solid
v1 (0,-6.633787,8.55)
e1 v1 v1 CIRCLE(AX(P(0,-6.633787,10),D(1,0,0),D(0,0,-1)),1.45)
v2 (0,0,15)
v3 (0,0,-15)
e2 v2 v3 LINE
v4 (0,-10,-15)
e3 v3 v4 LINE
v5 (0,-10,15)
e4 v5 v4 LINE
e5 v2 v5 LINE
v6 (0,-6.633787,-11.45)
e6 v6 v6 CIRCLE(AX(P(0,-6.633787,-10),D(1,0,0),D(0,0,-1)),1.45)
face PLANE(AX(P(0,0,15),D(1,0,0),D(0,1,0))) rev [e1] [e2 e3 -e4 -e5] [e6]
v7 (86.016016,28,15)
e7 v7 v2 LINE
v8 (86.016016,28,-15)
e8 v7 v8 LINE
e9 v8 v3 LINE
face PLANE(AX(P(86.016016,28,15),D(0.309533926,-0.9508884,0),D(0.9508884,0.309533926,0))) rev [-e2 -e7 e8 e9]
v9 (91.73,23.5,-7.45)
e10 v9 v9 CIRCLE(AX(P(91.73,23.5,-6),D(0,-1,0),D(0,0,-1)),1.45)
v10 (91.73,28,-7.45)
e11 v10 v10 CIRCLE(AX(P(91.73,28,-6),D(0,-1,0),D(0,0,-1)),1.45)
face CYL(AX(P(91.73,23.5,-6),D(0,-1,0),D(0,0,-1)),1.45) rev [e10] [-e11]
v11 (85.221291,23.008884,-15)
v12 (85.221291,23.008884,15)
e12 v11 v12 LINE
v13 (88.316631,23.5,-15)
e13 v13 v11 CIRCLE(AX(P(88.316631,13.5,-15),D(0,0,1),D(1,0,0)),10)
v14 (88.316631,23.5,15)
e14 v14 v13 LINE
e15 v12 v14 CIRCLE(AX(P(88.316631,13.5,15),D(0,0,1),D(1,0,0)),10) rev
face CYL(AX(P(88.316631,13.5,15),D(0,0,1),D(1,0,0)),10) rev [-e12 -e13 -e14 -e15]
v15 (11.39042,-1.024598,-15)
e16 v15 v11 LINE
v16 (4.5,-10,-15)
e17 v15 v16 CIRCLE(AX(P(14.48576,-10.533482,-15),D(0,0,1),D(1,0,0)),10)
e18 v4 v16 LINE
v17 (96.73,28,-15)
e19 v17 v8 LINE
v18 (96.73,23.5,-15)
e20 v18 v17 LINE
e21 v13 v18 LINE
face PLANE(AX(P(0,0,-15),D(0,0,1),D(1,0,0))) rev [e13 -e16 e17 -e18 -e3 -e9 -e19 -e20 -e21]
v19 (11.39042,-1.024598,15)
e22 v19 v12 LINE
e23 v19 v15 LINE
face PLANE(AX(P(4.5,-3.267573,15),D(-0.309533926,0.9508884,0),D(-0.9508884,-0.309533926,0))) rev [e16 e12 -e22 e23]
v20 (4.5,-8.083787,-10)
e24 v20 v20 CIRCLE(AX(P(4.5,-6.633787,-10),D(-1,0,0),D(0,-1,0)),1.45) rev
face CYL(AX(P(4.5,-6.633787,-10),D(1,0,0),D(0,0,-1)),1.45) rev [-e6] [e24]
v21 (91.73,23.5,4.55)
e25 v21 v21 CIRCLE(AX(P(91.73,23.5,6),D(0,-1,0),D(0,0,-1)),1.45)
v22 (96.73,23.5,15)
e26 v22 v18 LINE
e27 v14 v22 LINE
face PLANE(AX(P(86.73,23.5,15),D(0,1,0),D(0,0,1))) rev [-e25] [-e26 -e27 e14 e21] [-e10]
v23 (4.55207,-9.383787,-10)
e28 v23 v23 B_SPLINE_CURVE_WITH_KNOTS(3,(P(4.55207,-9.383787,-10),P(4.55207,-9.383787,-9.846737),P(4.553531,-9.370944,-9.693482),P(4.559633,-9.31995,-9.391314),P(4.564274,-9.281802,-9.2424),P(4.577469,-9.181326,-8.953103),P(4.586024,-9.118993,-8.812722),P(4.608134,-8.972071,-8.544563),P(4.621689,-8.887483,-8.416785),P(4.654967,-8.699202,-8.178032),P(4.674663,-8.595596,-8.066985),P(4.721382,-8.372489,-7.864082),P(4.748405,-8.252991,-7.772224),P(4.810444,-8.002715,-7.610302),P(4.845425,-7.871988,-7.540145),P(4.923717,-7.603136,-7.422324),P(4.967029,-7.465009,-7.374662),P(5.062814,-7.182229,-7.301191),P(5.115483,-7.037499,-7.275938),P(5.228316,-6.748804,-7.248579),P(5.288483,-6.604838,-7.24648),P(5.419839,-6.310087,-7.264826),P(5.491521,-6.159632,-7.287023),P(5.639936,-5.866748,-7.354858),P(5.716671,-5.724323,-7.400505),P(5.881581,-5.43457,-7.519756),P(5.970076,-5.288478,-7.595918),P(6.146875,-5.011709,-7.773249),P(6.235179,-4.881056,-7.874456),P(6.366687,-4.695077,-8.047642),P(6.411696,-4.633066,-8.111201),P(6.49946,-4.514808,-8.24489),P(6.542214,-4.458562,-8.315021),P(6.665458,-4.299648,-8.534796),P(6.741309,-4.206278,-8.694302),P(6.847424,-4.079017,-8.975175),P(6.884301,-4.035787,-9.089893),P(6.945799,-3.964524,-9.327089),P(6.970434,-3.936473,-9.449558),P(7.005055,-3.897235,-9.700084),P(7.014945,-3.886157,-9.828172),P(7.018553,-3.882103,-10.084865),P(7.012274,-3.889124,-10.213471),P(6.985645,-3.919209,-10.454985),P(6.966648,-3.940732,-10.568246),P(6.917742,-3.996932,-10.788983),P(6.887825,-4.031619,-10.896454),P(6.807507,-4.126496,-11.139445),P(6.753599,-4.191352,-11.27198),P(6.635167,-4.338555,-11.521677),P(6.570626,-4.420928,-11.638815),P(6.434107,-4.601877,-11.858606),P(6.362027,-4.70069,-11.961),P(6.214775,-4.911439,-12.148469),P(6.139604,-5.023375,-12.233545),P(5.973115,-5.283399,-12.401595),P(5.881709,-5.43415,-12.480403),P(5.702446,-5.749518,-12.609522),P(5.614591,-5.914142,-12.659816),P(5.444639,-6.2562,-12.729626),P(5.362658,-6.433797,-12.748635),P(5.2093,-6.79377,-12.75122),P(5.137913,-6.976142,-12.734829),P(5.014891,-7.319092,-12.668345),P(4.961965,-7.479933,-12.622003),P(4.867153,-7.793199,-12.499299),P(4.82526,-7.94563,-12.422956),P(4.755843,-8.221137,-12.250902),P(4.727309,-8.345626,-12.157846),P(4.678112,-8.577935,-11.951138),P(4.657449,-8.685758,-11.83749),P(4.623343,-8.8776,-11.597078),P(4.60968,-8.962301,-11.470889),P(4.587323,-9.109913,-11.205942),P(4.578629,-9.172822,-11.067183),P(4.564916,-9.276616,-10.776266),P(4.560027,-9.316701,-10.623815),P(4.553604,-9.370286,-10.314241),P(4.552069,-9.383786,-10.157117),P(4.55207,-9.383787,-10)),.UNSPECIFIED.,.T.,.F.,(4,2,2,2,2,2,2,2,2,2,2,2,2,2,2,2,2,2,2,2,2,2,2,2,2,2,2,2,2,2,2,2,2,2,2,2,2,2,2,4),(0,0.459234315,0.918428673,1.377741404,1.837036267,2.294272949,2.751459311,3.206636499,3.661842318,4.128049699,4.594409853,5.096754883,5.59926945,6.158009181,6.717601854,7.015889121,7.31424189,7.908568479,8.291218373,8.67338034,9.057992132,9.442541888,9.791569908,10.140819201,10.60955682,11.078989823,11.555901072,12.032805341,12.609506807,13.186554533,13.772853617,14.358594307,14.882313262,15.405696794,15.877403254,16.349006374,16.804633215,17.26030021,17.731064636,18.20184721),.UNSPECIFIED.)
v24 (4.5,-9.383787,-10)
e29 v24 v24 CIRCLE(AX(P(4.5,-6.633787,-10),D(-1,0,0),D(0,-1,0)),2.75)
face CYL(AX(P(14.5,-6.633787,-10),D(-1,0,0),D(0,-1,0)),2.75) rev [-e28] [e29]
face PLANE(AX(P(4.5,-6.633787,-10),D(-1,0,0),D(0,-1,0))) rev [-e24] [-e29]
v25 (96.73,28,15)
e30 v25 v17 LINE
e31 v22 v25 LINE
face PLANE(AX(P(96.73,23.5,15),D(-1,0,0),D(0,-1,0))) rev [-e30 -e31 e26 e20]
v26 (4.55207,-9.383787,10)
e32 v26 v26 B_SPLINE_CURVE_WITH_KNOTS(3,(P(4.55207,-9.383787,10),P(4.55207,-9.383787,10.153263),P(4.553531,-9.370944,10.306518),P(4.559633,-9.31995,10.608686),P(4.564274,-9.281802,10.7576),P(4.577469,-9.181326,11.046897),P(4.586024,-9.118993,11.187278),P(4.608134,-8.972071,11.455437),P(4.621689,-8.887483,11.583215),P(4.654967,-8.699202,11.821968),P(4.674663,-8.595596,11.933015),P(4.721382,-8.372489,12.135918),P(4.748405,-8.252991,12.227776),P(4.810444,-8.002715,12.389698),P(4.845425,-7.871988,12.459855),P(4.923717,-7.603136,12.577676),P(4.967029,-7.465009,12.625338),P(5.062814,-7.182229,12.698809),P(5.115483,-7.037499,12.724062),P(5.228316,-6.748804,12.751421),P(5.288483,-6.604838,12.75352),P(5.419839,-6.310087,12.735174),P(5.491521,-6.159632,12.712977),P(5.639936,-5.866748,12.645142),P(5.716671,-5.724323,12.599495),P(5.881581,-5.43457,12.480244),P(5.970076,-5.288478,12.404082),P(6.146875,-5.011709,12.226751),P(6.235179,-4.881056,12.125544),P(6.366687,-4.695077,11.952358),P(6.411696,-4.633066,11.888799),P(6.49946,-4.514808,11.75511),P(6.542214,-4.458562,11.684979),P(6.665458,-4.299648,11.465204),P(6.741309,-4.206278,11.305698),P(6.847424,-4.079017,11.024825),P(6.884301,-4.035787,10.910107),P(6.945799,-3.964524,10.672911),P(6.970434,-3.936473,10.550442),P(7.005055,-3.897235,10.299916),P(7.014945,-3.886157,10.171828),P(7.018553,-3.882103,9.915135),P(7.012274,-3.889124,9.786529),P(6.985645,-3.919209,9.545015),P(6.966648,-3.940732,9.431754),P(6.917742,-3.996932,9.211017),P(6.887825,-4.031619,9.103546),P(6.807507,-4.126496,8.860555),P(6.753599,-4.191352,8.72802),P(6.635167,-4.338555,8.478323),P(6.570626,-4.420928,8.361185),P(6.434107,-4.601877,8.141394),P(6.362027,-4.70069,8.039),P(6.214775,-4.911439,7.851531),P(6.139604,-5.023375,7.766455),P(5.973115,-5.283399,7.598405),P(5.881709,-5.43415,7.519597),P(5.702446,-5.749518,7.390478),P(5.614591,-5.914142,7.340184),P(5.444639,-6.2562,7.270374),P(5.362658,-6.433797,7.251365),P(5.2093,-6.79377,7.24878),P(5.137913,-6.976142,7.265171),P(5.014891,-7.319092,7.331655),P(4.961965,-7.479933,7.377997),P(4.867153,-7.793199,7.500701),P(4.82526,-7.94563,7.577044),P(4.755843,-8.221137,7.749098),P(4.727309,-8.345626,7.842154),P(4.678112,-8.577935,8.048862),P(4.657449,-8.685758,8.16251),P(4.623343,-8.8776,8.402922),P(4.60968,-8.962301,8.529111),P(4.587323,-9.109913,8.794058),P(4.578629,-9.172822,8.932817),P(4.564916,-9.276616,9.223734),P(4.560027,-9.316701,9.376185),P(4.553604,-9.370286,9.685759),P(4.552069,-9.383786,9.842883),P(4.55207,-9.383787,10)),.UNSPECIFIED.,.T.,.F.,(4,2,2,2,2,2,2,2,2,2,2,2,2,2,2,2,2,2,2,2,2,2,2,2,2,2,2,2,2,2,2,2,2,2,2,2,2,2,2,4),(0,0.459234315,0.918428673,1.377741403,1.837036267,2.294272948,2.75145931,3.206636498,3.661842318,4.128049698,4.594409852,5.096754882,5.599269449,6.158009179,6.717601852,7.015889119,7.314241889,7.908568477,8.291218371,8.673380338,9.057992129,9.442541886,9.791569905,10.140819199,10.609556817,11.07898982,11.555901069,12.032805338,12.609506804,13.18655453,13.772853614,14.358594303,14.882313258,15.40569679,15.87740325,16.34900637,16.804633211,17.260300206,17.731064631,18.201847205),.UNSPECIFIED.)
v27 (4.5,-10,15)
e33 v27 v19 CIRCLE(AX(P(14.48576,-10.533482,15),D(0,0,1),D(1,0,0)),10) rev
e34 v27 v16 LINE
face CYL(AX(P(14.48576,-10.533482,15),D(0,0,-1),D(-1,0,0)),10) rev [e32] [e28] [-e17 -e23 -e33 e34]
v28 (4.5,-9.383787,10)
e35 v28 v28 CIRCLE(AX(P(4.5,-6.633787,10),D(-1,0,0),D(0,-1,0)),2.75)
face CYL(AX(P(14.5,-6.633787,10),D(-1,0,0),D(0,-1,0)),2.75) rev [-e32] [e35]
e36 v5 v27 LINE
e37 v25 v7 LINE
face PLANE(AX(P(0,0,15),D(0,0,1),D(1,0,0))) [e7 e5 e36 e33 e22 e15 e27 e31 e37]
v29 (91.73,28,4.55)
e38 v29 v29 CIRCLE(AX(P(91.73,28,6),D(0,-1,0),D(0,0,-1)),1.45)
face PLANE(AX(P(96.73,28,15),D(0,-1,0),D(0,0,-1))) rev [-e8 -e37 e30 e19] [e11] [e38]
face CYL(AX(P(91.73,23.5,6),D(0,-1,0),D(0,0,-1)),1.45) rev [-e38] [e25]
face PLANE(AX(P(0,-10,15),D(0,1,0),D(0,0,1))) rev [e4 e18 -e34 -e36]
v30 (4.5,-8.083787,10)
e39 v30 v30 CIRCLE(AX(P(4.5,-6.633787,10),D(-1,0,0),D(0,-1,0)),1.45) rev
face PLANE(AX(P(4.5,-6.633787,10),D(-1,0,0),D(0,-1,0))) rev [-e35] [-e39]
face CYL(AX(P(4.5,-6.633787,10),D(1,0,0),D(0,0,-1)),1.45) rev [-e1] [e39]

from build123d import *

# Parameters (mm, degrees)
BOSS_EXTRUDE1_DEPTH    = 15
M2_5_CLEARANCE_HOLE1_D = 2.9
M2_5_CLEARANCE_HOLE2_D = 2.9
FILLET1_START          = -15
FILLET1_DEPTH          = 30
FILLET1_START_2        = 4.5
FILLET1_2_OUTLINE_R    = 1.45
FILLET1_2_DEPTH        = 2.5
CUT_EXTRUDE1_START     = -4.5
SKETCH6_R              = 2.75
SKETCH6_R_2            = 2.749999999
CUT_EXTRUDE1_DEPTH     = 10


with BuildPart() as part:
    # Sketch1 → Boss-Extrude1 (new, symmetric)
    with BuildSketch(Plane.XY):
        Polygon((0, 0), (0, -10), (4.5, -10), (4.5, -3.267573076), (86.73, 23.5), (96.73, 23.5), (96.73, 28), (86.016016224, 28), align=None)
    extrude(amount=BOSS_EXTRUDE1_DEPTH, both=True)

    # M2.5 Clearance Hole1 (through all)
    with Locations(Plane(origin=(0, 23.5, 0), x_dir=(-1, 0, 0), z_dir=(0, -1, 0))):
        with Locations((-91.73, -6), (-91.73, 6)):
            Hole(M2_5_CLEARANCE_HOLE1_D / 2)

    # M2.5 Clearance Hole2 (through all)
    with Locations(Plane(origin=(4.5, 0, 0), x_dir=(0, 0, -1), z_dir=(1, 0, 0))):
        with Locations((-10, -6.633786538), (10, -6.633786538)):
            Hole(M2_5_CLEARANCE_HOLE2_D / 2)

    # Fillet1: read off the stored shape, not the designer's step
    # Fillet1 outline → Fillet1 (add)
    with BuildSketch(Plane.XY.offset(FILLET1_START)):
        with BuildLine():
            ThreePointArc((4.5, -10), (6.553657374, -4.444003243), (11.390420445, -1.024598094))
            Line((11.390420445, -1.024598094), (4.5, -3.267573076))
            Line((4.5, -3.267573076), (4.5, -10))
        make_face()
        with BuildLine():
            ThreePointArc((85.221291355, 23.008883997), (86.749601573, 23.376457866), (88.316630614, 23.5))
            Line((88.316630614, 23.5), (86.73, 23.5))
            Line((86.73, 23.5), (85.221291355, 23.008883997))
        make_face()
    extrude(amount=FILLET1_DEPTH)

    # Fillet1 2 outline → Fillet1 2 (cut)
    with BuildSketch(Plane.YZ.offset(FILLET1_START_2)):
        with Locations((-6.633786538, -10)):
            Circle(FILLET1_2_OUTLINE_R)
        with Locations((-6.633786538, 10)):
            Circle(FILLET1_2_OUTLINE_R)
    extrude(amount=FILLET1_2_DEPTH, mode=Mode.SUBTRACT)

    # Sketch6 → Cut-Extrude1 (cut)
    with BuildSketch(Plane.ZY.offset(CUT_EXTRUDE1_START)):
        with Locations(Location((-10, -6.633786538, 0), (0, 0, 270))):
            Circle(SKETCH6_R)
        with Locations(Location((10, -6.633786538, 0), (0, 0, 270))):
            Circle(SKETCH6_R_2)
    extrude(amount=-CUT_EXTRUDE1_DEPTH, mode=Mode.SUBTRACT)


solid = part.part
